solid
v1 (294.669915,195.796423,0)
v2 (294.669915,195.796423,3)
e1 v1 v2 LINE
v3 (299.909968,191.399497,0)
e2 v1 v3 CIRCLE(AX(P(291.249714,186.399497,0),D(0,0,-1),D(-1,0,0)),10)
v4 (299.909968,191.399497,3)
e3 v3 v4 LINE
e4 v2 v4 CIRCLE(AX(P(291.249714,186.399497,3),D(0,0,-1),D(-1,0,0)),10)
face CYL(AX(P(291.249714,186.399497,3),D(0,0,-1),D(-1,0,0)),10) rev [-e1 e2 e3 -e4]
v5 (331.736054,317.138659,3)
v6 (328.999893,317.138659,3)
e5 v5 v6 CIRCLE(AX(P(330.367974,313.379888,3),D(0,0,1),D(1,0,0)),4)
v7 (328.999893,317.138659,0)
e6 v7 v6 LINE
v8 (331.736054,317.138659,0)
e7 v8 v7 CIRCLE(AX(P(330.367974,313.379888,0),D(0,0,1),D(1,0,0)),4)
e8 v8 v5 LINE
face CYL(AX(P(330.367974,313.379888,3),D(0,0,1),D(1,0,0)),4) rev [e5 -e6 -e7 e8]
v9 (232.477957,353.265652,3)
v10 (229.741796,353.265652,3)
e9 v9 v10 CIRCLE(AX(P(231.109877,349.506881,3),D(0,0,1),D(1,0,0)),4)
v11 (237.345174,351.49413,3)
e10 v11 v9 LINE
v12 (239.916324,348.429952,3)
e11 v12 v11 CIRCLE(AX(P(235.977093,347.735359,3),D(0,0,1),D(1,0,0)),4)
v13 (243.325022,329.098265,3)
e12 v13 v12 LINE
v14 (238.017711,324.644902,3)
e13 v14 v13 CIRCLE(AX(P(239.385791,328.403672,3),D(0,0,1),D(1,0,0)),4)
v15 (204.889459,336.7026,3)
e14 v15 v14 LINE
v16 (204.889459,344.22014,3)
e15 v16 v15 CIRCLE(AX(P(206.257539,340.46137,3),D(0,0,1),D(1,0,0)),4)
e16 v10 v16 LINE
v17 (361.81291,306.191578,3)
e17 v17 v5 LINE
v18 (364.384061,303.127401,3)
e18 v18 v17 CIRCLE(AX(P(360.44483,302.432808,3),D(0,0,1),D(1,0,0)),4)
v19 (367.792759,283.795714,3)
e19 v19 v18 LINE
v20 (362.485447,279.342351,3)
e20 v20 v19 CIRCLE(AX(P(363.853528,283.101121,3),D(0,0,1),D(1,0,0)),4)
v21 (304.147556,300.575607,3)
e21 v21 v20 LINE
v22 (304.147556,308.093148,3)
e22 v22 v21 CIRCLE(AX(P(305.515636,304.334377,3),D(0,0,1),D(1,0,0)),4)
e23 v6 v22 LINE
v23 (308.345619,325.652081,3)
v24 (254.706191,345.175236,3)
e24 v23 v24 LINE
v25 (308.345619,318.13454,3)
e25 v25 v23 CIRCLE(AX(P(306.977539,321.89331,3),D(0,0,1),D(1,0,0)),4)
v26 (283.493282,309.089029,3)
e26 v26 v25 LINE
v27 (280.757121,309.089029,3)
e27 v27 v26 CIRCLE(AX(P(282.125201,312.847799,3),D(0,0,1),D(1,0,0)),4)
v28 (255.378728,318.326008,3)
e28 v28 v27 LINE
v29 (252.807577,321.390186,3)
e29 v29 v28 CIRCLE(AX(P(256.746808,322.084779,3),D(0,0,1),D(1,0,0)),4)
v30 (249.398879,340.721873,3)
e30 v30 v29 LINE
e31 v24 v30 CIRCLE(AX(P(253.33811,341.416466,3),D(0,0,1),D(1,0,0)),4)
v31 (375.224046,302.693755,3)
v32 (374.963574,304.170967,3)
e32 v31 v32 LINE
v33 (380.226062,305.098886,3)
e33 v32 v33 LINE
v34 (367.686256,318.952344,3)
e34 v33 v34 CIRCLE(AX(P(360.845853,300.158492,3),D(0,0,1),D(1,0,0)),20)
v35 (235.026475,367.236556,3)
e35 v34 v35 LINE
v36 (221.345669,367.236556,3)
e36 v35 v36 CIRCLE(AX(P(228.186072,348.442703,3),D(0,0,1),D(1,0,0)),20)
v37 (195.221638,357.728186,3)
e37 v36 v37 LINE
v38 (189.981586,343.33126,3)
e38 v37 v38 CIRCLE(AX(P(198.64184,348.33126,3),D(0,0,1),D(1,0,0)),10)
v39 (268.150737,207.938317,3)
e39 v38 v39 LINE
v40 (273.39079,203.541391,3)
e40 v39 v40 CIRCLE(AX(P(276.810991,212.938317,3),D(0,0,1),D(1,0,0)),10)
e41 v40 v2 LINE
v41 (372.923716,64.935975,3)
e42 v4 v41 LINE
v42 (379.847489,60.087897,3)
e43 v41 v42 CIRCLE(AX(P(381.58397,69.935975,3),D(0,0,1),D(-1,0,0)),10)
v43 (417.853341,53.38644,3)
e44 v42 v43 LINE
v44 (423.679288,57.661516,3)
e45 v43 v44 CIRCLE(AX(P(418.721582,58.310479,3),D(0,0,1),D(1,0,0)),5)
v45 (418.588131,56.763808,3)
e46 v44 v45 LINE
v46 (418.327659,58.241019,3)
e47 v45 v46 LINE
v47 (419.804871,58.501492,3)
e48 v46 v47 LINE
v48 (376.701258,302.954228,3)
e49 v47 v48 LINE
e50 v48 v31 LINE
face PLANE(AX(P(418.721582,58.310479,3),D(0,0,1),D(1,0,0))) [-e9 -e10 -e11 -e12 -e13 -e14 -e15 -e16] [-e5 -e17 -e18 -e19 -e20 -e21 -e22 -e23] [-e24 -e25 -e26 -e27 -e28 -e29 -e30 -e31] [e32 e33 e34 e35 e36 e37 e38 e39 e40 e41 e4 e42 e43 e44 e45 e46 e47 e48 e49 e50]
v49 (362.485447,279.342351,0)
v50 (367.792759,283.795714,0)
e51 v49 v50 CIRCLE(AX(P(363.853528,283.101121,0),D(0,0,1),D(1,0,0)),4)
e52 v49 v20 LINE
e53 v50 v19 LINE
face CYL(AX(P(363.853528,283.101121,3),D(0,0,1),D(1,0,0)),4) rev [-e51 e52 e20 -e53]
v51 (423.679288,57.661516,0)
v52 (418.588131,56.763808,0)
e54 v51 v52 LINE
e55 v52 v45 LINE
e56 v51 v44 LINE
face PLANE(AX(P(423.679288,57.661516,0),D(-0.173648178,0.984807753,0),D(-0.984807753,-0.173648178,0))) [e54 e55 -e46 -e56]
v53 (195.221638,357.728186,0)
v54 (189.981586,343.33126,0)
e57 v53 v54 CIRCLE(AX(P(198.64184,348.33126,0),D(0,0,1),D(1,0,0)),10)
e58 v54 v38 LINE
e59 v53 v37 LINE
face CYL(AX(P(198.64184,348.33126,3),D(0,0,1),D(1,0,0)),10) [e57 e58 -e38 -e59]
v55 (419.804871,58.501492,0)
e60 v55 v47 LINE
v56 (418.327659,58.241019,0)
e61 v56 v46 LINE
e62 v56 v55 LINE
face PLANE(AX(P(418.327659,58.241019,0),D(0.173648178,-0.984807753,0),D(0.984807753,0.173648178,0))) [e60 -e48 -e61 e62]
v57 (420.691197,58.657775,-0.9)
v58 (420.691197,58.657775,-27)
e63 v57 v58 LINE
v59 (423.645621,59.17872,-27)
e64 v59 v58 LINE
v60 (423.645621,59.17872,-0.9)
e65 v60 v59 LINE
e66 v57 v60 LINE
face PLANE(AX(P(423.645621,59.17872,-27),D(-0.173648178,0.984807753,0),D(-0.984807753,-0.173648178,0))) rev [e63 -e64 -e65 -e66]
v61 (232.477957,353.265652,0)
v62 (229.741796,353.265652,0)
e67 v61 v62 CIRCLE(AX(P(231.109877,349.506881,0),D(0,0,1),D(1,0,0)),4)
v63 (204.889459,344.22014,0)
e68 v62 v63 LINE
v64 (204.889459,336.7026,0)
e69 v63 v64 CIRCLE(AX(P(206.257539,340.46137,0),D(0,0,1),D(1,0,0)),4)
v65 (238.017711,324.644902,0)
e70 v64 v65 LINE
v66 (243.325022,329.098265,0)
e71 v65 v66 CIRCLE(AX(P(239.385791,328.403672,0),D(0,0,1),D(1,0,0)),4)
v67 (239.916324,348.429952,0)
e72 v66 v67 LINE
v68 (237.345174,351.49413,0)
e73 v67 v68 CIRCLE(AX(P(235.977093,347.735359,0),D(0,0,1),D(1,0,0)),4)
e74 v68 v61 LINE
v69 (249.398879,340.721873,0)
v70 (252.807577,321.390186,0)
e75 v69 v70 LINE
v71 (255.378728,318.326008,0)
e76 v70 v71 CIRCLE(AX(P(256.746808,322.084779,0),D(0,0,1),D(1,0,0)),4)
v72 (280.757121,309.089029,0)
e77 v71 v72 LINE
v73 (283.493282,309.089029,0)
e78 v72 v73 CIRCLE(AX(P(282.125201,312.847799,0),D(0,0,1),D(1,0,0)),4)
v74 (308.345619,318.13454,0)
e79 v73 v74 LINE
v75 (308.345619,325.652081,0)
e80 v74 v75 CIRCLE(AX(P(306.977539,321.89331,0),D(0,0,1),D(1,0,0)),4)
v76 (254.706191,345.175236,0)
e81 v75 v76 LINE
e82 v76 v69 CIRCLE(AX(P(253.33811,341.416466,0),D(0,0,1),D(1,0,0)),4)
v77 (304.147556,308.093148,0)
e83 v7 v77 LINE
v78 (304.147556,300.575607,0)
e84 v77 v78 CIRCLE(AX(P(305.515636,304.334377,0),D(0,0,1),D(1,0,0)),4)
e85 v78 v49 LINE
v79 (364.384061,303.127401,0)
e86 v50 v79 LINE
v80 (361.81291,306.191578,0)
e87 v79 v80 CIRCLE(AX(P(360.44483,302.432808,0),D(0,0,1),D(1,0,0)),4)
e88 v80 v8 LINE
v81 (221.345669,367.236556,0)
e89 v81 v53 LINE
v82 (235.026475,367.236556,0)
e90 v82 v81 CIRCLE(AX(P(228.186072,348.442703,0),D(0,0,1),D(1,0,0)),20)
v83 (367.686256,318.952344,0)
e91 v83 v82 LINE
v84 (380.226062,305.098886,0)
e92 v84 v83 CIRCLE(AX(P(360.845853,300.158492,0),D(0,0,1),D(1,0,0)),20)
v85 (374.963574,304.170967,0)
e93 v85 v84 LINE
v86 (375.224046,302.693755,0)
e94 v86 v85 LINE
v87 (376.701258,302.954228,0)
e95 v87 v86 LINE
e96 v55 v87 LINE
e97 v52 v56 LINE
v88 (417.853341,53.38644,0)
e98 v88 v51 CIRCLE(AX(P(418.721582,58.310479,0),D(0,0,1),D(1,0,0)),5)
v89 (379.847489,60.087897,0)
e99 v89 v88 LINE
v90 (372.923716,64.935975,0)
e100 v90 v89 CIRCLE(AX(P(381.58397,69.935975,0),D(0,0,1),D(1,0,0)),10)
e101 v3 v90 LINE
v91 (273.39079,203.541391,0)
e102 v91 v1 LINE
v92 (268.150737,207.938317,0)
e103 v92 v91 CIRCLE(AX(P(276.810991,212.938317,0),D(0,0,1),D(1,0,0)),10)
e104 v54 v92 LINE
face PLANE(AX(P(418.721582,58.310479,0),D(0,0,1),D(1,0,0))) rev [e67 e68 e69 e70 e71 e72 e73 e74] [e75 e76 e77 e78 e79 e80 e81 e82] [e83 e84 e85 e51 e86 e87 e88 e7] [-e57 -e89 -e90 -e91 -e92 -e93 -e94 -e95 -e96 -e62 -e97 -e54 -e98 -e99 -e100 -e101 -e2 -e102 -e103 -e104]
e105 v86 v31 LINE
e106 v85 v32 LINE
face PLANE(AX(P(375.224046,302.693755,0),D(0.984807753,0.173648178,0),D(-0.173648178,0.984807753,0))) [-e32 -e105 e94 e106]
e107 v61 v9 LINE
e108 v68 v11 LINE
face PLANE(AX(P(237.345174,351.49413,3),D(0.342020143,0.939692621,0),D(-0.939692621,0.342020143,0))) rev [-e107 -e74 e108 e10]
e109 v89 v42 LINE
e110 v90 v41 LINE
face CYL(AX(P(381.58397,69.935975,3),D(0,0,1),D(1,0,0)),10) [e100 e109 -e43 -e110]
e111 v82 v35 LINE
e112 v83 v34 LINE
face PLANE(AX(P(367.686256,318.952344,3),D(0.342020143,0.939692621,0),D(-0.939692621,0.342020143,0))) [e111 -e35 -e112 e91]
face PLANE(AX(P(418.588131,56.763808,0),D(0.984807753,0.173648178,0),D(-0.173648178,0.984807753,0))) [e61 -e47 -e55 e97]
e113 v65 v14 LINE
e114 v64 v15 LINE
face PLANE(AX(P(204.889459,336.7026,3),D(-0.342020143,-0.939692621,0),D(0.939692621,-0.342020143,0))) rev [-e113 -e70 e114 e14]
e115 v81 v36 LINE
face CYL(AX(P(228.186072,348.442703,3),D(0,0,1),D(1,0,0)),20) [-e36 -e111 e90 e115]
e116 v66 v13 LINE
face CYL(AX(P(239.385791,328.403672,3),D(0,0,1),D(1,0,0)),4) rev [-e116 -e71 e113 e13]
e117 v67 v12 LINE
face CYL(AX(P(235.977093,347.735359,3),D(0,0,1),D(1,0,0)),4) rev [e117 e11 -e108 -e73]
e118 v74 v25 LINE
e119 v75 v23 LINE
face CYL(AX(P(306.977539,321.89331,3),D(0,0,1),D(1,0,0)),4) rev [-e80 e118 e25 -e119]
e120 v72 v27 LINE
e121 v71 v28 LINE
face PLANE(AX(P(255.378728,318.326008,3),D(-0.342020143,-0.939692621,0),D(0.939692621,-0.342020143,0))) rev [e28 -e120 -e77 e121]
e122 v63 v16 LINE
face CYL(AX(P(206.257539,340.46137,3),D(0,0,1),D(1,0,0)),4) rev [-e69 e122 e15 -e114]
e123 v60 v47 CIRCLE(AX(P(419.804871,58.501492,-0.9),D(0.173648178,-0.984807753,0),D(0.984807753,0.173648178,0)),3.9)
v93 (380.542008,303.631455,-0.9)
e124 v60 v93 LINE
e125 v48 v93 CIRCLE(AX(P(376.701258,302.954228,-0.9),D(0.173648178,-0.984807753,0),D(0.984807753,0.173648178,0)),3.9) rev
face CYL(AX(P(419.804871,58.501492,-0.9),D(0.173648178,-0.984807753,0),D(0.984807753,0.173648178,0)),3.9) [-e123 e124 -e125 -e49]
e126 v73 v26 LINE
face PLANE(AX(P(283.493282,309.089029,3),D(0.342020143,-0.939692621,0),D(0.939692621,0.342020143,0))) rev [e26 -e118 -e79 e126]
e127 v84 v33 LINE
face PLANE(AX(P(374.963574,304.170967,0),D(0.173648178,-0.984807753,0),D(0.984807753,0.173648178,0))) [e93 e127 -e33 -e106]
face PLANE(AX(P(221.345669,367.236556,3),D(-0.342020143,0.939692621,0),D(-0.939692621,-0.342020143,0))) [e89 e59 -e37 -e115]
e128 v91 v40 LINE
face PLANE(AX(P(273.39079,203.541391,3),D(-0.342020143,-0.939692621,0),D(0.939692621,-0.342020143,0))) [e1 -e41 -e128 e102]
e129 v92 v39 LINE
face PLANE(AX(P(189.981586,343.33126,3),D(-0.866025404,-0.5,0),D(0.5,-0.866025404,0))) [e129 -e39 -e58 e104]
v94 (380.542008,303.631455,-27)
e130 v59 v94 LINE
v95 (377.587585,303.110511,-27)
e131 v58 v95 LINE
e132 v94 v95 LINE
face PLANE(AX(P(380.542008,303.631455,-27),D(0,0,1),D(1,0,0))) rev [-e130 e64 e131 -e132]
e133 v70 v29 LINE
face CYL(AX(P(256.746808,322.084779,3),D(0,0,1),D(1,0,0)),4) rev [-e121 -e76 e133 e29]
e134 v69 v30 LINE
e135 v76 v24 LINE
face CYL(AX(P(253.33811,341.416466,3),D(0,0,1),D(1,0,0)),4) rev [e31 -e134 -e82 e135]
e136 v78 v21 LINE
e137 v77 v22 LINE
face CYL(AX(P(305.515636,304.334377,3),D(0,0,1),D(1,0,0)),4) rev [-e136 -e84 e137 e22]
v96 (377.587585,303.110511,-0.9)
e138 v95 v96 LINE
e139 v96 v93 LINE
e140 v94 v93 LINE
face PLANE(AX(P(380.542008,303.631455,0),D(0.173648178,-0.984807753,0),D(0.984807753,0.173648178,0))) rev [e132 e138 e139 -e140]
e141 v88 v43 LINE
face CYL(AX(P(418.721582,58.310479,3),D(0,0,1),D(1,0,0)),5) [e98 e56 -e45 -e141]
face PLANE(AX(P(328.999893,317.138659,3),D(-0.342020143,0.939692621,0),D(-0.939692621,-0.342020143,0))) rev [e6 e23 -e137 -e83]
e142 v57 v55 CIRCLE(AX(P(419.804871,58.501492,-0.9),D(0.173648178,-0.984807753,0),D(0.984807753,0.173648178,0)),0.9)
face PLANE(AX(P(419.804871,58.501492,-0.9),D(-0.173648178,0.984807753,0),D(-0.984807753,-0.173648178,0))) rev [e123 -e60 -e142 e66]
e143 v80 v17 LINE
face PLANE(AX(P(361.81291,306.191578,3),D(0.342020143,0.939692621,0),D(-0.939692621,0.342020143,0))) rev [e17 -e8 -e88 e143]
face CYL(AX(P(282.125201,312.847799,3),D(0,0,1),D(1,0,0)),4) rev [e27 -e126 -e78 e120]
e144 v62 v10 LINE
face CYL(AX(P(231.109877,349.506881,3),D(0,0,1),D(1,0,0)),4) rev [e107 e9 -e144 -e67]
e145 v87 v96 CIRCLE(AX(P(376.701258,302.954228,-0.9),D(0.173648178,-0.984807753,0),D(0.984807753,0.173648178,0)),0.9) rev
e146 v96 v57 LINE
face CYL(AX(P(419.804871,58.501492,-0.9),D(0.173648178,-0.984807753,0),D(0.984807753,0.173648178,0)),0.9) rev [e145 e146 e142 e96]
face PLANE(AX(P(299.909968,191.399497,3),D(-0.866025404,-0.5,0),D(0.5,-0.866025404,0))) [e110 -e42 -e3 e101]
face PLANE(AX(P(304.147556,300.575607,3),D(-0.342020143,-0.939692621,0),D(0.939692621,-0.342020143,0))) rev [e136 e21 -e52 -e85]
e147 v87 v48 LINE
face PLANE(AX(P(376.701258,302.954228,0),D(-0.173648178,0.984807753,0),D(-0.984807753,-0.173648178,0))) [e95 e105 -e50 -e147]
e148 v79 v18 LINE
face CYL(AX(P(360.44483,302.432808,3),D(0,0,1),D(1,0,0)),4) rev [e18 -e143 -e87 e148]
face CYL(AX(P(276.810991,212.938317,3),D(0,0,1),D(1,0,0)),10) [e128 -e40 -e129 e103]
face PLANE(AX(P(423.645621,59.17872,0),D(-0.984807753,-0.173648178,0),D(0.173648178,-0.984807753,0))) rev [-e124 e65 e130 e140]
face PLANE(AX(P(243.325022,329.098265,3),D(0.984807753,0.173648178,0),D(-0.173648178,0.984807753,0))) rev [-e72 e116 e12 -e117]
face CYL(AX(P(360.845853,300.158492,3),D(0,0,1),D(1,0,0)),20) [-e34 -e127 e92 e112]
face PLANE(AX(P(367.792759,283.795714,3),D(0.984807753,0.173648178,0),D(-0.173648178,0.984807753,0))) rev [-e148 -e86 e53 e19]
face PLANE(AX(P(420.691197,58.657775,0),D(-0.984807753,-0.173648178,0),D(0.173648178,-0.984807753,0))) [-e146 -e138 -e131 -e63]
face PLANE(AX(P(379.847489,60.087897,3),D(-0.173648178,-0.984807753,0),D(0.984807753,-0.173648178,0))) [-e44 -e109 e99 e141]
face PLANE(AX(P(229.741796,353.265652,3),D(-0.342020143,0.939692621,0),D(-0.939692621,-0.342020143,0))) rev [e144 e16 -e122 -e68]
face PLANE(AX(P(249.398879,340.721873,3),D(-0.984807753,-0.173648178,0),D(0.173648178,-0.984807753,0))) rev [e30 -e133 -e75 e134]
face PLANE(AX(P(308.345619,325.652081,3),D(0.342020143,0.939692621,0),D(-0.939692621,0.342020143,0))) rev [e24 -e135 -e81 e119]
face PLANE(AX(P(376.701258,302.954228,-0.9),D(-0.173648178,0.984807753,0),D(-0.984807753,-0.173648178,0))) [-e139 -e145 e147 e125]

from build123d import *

# Parameters (mm, degrees)
RESSALTO_EXTRUS_O1_DEPTH        = 3
ARESTA_FLANGE1_STRIP_W          = 13.8
ARESTA_FLANGE1_STRIP_H          = 3
ARESTA_FLANGE1_STRIP_CUT_DEPTH  = 248.223813341
ARESTA_FLANGE1_RELIEF_W         = 15.3
ARESTA_FLANGE1_RELIEF_H         = 1.5
ARESTA_FLANGE1_RELIEF_CUT_DEPTH = 3
ARESTA_FLANGE1_DEPTH            = 248.223813341


# Sheet-metal steps are written as plain solids
with BuildPart() as part:
    # Esboço29 → Ressalto-extrusão1 (new body)
    with BuildSketch(Plane.XY):
        with BuildLine():
            Line((423.645620755, 59.178719541), (380.542007914, 303.631455401))
            ThreePointArc((380.542007914, 303.631455401), (376.166741716, 313.014244041), (367.686255721, 318.952344263))
            Line((367.686255721, 318.952344263), (235.026475013, 367.236555725))
            ThreePointArc((235.026475013, 367.236555725), (228.186072146, 368.44270331), (221.34566928, 367.236555725))
            Line((221.34566928, 367.236555725), (195.221638123, 357.728185985))
            ThreePointArc((195.221638123, 357.728185985), (189.244913348, 351.75146121), (189.981585518, 343.331259777))
            Line((189.981585518, 343.331259777), (268.150737271, 207.938317356))
            ThreePointArc((268.150737271, 207.938317356), (270.383115212, 205.277872925), (273.390789876, 203.541391148))
            Line((273.390789876, 203.541391148), (294.669915314, 195.796422877))
            ThreePointArc((294.669915314, 195.796422877), (297.677589977, 194.059941101), (299.909967918, 191.399496669))
            Line((299.909967918, 191.399496669), (372.923716413, 64.935974625))
            ThreePointArc((372.923716413, 64.935974625), (375.848206088, 61.744454182), (379.847488675, 60.087897095))
            Line((379.847488675, 60.087897095), (417.853341101, 53.386439887))
            ThreePointArc((417.853341101, 53.386439887), (422.257115895, 54.774944746), (423.645620755, 59.178719541))
        make_face()
        with BuildLine():
            Line((243.325022214, 329.098265065), (239.916324262, 348.429951789))
            ThreePointArc((239.916324262, 348.429951789), (239.041271023, 350.306509517), (237.345173823, 351.494129561))
            Line((237.345173823, 351.494129561), (232.47795712, 353.265651565))
            ThreePointArc((232.47795712, 353.265651565), (231.109876546, 353.506881082), (229.741795973, 353.265651565))
            Line((229.741795973, 353.265651565), (204.889458572, 344.220140499))
            ThreePointArc((204.889458572, 344.220140499), (202.257539145, 340.461370016), (204.889458572, 336.702599533))
            Line((204.889458572, 336.702599533), (238.017710629, 324.644901871))
            ThreePointArc((238.017710629, 324.644901871), (241.956941641, 325.339494581), (243.325022214, 329.098265065))
        make_face(mode=Mode.SUBTRACT)
        with BuildLine():
            Line((249.39887944, 340.721872869), (252.807577392, 321.390186145))
            ThreePointArc((252.807577392, 321.390186145), (253.682630632, 319.513628417), (255.378727831, 318.326008373))
            Line((255.378727831, 318.326008373), (280.757120558, 309.089028826))
            ThreePointArc((280.757120558, 309.089028826), (282.125201132, 308.847799309), (283.493281705, 309.089028826))
            Line((283.493281705, 309.089028826), (308.345619106, 318.134539892))
            ThreePointArc((308.345619106, 318.134539892), (310.977538533, 321.893310376), (308.345619106, 325.652080859))
            Line((308.345619106, 325.652080859), (254.706191026, 345.175236063))
            ThreePointArc((254.706191026, 345.175236063), (250.766960014, 344.480643352), (249.39887944, 340.721872869))
        make_face(mode=Mode.SUBTRACT)
        with BuildLine():
            Line((328.999893161, 317.138658679), (304.14755576, 308.093147613))
            ThreePointArc((304.14755576, 308.093147613), (301.515636333, 304.33437713), (304.14755576, 300.575606647))
            Line((304.14755576, 300.575606647), (362.485446944, 279.342350725))
            ThreePointArc((362.485446944, 279.342350725), (366.424677956, 280.036943436), (367.79275853, 283.795713919))
            Line((367.79275853, 283.795713919), (364.384060578, 303.127400644))
            ThreePointArc((364.384060578, 303.127400644), (363.509007338, 305.003958372), (361.812910139, 306.191578416))
            Line((361.812910139, 306.191578416), (331.736054308, 317.138658679))
            ThreePointArc((331.736054308, 317.138658679), (330.367973734, 317.379888196), (328.999893161, 317.138658679))
        make_face(mode=Mode.SUBTRACT)
    extrude(amount=RESSALTO_EXTRUS_O1_DEPTH)

    # Aresta-Flange1 strip (across the edge) → Aresta-Flange1 strip cut (cut)
    with BuildSketch(Plane(origin=(380.542007914, 303.631455401, 0), x_dir=(-0.9848077530122086, -0.17364817766692797, -3.491481338843133e-15), z_dir=(0.17364817766692797, -0.9848077530122086, 0))):
        with Locations((-3, -1.5)):
            Rectangle(ARESTA_FLANGE1_STRIP_W, ARESTA_FLANGE1_STRIP_H)
    extrude(amount=ARESTA_FLANGE1_STRIP_CUT_DEPTH, mode=Mode.SUBTRACT)

    # Aresta-Flange1 relief (on the sheet) → Aresta-Flange1 relief cut (cut)
    with BuildSketch(Plane(origin=(376.701257678, 302.954227508, 0), x_dir=(-0.9848077530122086, -0.17364817766692797, -6.982962677686267e-15), z_dir=(0, 0, -1))):
        with Locations((-6.15, 0.75)):
            Rectangle(ARESTA_FLANGE1_RELIEF_W, ARESTA_FLANGE1_RELIEF_H)
        with Locations((-6.15, -248.973813341)):
            Rectangle(ARESTA_FLANGE1_RELIEF_W, ARESTA_FLANGE1_RELIEF_H)
    extrude(amount=-ARESTA_FLANGE1_RELIEF_CUT_DEPTH, mode=Mode.SUBTRACT)

    # Aresta-Flange1 section (across the edge) → Aresta-Flange1 (add)
    with BuildSketch(Plane(origin=(380.542007914, 303.631455401, 0), x_dir=(-0.9848077530122086, -0.17364817766692797, -3.491481338843133e-15), z_dir=(0.17364817766692797, -0.9848077530122086, 0))):
        with BuildLine():
            Line((0, 0.9), (0, 27))
            Line((0, 27), (3, 27))
            Line((3, 27), (3, 0.9))
            ThreePointArc((3, 0.9), (3.263603897, 0.263603897), (3.9, 0))
            Line((3.9, 0), (3.9, -3))
            ThreePointArc((3.9, -3), (1.142283553, -1.857716447), (0, 0.9))
        make_face()
    extrude(amount=ARESTA_FLANGE1_DEPTH)


solid = part.part
